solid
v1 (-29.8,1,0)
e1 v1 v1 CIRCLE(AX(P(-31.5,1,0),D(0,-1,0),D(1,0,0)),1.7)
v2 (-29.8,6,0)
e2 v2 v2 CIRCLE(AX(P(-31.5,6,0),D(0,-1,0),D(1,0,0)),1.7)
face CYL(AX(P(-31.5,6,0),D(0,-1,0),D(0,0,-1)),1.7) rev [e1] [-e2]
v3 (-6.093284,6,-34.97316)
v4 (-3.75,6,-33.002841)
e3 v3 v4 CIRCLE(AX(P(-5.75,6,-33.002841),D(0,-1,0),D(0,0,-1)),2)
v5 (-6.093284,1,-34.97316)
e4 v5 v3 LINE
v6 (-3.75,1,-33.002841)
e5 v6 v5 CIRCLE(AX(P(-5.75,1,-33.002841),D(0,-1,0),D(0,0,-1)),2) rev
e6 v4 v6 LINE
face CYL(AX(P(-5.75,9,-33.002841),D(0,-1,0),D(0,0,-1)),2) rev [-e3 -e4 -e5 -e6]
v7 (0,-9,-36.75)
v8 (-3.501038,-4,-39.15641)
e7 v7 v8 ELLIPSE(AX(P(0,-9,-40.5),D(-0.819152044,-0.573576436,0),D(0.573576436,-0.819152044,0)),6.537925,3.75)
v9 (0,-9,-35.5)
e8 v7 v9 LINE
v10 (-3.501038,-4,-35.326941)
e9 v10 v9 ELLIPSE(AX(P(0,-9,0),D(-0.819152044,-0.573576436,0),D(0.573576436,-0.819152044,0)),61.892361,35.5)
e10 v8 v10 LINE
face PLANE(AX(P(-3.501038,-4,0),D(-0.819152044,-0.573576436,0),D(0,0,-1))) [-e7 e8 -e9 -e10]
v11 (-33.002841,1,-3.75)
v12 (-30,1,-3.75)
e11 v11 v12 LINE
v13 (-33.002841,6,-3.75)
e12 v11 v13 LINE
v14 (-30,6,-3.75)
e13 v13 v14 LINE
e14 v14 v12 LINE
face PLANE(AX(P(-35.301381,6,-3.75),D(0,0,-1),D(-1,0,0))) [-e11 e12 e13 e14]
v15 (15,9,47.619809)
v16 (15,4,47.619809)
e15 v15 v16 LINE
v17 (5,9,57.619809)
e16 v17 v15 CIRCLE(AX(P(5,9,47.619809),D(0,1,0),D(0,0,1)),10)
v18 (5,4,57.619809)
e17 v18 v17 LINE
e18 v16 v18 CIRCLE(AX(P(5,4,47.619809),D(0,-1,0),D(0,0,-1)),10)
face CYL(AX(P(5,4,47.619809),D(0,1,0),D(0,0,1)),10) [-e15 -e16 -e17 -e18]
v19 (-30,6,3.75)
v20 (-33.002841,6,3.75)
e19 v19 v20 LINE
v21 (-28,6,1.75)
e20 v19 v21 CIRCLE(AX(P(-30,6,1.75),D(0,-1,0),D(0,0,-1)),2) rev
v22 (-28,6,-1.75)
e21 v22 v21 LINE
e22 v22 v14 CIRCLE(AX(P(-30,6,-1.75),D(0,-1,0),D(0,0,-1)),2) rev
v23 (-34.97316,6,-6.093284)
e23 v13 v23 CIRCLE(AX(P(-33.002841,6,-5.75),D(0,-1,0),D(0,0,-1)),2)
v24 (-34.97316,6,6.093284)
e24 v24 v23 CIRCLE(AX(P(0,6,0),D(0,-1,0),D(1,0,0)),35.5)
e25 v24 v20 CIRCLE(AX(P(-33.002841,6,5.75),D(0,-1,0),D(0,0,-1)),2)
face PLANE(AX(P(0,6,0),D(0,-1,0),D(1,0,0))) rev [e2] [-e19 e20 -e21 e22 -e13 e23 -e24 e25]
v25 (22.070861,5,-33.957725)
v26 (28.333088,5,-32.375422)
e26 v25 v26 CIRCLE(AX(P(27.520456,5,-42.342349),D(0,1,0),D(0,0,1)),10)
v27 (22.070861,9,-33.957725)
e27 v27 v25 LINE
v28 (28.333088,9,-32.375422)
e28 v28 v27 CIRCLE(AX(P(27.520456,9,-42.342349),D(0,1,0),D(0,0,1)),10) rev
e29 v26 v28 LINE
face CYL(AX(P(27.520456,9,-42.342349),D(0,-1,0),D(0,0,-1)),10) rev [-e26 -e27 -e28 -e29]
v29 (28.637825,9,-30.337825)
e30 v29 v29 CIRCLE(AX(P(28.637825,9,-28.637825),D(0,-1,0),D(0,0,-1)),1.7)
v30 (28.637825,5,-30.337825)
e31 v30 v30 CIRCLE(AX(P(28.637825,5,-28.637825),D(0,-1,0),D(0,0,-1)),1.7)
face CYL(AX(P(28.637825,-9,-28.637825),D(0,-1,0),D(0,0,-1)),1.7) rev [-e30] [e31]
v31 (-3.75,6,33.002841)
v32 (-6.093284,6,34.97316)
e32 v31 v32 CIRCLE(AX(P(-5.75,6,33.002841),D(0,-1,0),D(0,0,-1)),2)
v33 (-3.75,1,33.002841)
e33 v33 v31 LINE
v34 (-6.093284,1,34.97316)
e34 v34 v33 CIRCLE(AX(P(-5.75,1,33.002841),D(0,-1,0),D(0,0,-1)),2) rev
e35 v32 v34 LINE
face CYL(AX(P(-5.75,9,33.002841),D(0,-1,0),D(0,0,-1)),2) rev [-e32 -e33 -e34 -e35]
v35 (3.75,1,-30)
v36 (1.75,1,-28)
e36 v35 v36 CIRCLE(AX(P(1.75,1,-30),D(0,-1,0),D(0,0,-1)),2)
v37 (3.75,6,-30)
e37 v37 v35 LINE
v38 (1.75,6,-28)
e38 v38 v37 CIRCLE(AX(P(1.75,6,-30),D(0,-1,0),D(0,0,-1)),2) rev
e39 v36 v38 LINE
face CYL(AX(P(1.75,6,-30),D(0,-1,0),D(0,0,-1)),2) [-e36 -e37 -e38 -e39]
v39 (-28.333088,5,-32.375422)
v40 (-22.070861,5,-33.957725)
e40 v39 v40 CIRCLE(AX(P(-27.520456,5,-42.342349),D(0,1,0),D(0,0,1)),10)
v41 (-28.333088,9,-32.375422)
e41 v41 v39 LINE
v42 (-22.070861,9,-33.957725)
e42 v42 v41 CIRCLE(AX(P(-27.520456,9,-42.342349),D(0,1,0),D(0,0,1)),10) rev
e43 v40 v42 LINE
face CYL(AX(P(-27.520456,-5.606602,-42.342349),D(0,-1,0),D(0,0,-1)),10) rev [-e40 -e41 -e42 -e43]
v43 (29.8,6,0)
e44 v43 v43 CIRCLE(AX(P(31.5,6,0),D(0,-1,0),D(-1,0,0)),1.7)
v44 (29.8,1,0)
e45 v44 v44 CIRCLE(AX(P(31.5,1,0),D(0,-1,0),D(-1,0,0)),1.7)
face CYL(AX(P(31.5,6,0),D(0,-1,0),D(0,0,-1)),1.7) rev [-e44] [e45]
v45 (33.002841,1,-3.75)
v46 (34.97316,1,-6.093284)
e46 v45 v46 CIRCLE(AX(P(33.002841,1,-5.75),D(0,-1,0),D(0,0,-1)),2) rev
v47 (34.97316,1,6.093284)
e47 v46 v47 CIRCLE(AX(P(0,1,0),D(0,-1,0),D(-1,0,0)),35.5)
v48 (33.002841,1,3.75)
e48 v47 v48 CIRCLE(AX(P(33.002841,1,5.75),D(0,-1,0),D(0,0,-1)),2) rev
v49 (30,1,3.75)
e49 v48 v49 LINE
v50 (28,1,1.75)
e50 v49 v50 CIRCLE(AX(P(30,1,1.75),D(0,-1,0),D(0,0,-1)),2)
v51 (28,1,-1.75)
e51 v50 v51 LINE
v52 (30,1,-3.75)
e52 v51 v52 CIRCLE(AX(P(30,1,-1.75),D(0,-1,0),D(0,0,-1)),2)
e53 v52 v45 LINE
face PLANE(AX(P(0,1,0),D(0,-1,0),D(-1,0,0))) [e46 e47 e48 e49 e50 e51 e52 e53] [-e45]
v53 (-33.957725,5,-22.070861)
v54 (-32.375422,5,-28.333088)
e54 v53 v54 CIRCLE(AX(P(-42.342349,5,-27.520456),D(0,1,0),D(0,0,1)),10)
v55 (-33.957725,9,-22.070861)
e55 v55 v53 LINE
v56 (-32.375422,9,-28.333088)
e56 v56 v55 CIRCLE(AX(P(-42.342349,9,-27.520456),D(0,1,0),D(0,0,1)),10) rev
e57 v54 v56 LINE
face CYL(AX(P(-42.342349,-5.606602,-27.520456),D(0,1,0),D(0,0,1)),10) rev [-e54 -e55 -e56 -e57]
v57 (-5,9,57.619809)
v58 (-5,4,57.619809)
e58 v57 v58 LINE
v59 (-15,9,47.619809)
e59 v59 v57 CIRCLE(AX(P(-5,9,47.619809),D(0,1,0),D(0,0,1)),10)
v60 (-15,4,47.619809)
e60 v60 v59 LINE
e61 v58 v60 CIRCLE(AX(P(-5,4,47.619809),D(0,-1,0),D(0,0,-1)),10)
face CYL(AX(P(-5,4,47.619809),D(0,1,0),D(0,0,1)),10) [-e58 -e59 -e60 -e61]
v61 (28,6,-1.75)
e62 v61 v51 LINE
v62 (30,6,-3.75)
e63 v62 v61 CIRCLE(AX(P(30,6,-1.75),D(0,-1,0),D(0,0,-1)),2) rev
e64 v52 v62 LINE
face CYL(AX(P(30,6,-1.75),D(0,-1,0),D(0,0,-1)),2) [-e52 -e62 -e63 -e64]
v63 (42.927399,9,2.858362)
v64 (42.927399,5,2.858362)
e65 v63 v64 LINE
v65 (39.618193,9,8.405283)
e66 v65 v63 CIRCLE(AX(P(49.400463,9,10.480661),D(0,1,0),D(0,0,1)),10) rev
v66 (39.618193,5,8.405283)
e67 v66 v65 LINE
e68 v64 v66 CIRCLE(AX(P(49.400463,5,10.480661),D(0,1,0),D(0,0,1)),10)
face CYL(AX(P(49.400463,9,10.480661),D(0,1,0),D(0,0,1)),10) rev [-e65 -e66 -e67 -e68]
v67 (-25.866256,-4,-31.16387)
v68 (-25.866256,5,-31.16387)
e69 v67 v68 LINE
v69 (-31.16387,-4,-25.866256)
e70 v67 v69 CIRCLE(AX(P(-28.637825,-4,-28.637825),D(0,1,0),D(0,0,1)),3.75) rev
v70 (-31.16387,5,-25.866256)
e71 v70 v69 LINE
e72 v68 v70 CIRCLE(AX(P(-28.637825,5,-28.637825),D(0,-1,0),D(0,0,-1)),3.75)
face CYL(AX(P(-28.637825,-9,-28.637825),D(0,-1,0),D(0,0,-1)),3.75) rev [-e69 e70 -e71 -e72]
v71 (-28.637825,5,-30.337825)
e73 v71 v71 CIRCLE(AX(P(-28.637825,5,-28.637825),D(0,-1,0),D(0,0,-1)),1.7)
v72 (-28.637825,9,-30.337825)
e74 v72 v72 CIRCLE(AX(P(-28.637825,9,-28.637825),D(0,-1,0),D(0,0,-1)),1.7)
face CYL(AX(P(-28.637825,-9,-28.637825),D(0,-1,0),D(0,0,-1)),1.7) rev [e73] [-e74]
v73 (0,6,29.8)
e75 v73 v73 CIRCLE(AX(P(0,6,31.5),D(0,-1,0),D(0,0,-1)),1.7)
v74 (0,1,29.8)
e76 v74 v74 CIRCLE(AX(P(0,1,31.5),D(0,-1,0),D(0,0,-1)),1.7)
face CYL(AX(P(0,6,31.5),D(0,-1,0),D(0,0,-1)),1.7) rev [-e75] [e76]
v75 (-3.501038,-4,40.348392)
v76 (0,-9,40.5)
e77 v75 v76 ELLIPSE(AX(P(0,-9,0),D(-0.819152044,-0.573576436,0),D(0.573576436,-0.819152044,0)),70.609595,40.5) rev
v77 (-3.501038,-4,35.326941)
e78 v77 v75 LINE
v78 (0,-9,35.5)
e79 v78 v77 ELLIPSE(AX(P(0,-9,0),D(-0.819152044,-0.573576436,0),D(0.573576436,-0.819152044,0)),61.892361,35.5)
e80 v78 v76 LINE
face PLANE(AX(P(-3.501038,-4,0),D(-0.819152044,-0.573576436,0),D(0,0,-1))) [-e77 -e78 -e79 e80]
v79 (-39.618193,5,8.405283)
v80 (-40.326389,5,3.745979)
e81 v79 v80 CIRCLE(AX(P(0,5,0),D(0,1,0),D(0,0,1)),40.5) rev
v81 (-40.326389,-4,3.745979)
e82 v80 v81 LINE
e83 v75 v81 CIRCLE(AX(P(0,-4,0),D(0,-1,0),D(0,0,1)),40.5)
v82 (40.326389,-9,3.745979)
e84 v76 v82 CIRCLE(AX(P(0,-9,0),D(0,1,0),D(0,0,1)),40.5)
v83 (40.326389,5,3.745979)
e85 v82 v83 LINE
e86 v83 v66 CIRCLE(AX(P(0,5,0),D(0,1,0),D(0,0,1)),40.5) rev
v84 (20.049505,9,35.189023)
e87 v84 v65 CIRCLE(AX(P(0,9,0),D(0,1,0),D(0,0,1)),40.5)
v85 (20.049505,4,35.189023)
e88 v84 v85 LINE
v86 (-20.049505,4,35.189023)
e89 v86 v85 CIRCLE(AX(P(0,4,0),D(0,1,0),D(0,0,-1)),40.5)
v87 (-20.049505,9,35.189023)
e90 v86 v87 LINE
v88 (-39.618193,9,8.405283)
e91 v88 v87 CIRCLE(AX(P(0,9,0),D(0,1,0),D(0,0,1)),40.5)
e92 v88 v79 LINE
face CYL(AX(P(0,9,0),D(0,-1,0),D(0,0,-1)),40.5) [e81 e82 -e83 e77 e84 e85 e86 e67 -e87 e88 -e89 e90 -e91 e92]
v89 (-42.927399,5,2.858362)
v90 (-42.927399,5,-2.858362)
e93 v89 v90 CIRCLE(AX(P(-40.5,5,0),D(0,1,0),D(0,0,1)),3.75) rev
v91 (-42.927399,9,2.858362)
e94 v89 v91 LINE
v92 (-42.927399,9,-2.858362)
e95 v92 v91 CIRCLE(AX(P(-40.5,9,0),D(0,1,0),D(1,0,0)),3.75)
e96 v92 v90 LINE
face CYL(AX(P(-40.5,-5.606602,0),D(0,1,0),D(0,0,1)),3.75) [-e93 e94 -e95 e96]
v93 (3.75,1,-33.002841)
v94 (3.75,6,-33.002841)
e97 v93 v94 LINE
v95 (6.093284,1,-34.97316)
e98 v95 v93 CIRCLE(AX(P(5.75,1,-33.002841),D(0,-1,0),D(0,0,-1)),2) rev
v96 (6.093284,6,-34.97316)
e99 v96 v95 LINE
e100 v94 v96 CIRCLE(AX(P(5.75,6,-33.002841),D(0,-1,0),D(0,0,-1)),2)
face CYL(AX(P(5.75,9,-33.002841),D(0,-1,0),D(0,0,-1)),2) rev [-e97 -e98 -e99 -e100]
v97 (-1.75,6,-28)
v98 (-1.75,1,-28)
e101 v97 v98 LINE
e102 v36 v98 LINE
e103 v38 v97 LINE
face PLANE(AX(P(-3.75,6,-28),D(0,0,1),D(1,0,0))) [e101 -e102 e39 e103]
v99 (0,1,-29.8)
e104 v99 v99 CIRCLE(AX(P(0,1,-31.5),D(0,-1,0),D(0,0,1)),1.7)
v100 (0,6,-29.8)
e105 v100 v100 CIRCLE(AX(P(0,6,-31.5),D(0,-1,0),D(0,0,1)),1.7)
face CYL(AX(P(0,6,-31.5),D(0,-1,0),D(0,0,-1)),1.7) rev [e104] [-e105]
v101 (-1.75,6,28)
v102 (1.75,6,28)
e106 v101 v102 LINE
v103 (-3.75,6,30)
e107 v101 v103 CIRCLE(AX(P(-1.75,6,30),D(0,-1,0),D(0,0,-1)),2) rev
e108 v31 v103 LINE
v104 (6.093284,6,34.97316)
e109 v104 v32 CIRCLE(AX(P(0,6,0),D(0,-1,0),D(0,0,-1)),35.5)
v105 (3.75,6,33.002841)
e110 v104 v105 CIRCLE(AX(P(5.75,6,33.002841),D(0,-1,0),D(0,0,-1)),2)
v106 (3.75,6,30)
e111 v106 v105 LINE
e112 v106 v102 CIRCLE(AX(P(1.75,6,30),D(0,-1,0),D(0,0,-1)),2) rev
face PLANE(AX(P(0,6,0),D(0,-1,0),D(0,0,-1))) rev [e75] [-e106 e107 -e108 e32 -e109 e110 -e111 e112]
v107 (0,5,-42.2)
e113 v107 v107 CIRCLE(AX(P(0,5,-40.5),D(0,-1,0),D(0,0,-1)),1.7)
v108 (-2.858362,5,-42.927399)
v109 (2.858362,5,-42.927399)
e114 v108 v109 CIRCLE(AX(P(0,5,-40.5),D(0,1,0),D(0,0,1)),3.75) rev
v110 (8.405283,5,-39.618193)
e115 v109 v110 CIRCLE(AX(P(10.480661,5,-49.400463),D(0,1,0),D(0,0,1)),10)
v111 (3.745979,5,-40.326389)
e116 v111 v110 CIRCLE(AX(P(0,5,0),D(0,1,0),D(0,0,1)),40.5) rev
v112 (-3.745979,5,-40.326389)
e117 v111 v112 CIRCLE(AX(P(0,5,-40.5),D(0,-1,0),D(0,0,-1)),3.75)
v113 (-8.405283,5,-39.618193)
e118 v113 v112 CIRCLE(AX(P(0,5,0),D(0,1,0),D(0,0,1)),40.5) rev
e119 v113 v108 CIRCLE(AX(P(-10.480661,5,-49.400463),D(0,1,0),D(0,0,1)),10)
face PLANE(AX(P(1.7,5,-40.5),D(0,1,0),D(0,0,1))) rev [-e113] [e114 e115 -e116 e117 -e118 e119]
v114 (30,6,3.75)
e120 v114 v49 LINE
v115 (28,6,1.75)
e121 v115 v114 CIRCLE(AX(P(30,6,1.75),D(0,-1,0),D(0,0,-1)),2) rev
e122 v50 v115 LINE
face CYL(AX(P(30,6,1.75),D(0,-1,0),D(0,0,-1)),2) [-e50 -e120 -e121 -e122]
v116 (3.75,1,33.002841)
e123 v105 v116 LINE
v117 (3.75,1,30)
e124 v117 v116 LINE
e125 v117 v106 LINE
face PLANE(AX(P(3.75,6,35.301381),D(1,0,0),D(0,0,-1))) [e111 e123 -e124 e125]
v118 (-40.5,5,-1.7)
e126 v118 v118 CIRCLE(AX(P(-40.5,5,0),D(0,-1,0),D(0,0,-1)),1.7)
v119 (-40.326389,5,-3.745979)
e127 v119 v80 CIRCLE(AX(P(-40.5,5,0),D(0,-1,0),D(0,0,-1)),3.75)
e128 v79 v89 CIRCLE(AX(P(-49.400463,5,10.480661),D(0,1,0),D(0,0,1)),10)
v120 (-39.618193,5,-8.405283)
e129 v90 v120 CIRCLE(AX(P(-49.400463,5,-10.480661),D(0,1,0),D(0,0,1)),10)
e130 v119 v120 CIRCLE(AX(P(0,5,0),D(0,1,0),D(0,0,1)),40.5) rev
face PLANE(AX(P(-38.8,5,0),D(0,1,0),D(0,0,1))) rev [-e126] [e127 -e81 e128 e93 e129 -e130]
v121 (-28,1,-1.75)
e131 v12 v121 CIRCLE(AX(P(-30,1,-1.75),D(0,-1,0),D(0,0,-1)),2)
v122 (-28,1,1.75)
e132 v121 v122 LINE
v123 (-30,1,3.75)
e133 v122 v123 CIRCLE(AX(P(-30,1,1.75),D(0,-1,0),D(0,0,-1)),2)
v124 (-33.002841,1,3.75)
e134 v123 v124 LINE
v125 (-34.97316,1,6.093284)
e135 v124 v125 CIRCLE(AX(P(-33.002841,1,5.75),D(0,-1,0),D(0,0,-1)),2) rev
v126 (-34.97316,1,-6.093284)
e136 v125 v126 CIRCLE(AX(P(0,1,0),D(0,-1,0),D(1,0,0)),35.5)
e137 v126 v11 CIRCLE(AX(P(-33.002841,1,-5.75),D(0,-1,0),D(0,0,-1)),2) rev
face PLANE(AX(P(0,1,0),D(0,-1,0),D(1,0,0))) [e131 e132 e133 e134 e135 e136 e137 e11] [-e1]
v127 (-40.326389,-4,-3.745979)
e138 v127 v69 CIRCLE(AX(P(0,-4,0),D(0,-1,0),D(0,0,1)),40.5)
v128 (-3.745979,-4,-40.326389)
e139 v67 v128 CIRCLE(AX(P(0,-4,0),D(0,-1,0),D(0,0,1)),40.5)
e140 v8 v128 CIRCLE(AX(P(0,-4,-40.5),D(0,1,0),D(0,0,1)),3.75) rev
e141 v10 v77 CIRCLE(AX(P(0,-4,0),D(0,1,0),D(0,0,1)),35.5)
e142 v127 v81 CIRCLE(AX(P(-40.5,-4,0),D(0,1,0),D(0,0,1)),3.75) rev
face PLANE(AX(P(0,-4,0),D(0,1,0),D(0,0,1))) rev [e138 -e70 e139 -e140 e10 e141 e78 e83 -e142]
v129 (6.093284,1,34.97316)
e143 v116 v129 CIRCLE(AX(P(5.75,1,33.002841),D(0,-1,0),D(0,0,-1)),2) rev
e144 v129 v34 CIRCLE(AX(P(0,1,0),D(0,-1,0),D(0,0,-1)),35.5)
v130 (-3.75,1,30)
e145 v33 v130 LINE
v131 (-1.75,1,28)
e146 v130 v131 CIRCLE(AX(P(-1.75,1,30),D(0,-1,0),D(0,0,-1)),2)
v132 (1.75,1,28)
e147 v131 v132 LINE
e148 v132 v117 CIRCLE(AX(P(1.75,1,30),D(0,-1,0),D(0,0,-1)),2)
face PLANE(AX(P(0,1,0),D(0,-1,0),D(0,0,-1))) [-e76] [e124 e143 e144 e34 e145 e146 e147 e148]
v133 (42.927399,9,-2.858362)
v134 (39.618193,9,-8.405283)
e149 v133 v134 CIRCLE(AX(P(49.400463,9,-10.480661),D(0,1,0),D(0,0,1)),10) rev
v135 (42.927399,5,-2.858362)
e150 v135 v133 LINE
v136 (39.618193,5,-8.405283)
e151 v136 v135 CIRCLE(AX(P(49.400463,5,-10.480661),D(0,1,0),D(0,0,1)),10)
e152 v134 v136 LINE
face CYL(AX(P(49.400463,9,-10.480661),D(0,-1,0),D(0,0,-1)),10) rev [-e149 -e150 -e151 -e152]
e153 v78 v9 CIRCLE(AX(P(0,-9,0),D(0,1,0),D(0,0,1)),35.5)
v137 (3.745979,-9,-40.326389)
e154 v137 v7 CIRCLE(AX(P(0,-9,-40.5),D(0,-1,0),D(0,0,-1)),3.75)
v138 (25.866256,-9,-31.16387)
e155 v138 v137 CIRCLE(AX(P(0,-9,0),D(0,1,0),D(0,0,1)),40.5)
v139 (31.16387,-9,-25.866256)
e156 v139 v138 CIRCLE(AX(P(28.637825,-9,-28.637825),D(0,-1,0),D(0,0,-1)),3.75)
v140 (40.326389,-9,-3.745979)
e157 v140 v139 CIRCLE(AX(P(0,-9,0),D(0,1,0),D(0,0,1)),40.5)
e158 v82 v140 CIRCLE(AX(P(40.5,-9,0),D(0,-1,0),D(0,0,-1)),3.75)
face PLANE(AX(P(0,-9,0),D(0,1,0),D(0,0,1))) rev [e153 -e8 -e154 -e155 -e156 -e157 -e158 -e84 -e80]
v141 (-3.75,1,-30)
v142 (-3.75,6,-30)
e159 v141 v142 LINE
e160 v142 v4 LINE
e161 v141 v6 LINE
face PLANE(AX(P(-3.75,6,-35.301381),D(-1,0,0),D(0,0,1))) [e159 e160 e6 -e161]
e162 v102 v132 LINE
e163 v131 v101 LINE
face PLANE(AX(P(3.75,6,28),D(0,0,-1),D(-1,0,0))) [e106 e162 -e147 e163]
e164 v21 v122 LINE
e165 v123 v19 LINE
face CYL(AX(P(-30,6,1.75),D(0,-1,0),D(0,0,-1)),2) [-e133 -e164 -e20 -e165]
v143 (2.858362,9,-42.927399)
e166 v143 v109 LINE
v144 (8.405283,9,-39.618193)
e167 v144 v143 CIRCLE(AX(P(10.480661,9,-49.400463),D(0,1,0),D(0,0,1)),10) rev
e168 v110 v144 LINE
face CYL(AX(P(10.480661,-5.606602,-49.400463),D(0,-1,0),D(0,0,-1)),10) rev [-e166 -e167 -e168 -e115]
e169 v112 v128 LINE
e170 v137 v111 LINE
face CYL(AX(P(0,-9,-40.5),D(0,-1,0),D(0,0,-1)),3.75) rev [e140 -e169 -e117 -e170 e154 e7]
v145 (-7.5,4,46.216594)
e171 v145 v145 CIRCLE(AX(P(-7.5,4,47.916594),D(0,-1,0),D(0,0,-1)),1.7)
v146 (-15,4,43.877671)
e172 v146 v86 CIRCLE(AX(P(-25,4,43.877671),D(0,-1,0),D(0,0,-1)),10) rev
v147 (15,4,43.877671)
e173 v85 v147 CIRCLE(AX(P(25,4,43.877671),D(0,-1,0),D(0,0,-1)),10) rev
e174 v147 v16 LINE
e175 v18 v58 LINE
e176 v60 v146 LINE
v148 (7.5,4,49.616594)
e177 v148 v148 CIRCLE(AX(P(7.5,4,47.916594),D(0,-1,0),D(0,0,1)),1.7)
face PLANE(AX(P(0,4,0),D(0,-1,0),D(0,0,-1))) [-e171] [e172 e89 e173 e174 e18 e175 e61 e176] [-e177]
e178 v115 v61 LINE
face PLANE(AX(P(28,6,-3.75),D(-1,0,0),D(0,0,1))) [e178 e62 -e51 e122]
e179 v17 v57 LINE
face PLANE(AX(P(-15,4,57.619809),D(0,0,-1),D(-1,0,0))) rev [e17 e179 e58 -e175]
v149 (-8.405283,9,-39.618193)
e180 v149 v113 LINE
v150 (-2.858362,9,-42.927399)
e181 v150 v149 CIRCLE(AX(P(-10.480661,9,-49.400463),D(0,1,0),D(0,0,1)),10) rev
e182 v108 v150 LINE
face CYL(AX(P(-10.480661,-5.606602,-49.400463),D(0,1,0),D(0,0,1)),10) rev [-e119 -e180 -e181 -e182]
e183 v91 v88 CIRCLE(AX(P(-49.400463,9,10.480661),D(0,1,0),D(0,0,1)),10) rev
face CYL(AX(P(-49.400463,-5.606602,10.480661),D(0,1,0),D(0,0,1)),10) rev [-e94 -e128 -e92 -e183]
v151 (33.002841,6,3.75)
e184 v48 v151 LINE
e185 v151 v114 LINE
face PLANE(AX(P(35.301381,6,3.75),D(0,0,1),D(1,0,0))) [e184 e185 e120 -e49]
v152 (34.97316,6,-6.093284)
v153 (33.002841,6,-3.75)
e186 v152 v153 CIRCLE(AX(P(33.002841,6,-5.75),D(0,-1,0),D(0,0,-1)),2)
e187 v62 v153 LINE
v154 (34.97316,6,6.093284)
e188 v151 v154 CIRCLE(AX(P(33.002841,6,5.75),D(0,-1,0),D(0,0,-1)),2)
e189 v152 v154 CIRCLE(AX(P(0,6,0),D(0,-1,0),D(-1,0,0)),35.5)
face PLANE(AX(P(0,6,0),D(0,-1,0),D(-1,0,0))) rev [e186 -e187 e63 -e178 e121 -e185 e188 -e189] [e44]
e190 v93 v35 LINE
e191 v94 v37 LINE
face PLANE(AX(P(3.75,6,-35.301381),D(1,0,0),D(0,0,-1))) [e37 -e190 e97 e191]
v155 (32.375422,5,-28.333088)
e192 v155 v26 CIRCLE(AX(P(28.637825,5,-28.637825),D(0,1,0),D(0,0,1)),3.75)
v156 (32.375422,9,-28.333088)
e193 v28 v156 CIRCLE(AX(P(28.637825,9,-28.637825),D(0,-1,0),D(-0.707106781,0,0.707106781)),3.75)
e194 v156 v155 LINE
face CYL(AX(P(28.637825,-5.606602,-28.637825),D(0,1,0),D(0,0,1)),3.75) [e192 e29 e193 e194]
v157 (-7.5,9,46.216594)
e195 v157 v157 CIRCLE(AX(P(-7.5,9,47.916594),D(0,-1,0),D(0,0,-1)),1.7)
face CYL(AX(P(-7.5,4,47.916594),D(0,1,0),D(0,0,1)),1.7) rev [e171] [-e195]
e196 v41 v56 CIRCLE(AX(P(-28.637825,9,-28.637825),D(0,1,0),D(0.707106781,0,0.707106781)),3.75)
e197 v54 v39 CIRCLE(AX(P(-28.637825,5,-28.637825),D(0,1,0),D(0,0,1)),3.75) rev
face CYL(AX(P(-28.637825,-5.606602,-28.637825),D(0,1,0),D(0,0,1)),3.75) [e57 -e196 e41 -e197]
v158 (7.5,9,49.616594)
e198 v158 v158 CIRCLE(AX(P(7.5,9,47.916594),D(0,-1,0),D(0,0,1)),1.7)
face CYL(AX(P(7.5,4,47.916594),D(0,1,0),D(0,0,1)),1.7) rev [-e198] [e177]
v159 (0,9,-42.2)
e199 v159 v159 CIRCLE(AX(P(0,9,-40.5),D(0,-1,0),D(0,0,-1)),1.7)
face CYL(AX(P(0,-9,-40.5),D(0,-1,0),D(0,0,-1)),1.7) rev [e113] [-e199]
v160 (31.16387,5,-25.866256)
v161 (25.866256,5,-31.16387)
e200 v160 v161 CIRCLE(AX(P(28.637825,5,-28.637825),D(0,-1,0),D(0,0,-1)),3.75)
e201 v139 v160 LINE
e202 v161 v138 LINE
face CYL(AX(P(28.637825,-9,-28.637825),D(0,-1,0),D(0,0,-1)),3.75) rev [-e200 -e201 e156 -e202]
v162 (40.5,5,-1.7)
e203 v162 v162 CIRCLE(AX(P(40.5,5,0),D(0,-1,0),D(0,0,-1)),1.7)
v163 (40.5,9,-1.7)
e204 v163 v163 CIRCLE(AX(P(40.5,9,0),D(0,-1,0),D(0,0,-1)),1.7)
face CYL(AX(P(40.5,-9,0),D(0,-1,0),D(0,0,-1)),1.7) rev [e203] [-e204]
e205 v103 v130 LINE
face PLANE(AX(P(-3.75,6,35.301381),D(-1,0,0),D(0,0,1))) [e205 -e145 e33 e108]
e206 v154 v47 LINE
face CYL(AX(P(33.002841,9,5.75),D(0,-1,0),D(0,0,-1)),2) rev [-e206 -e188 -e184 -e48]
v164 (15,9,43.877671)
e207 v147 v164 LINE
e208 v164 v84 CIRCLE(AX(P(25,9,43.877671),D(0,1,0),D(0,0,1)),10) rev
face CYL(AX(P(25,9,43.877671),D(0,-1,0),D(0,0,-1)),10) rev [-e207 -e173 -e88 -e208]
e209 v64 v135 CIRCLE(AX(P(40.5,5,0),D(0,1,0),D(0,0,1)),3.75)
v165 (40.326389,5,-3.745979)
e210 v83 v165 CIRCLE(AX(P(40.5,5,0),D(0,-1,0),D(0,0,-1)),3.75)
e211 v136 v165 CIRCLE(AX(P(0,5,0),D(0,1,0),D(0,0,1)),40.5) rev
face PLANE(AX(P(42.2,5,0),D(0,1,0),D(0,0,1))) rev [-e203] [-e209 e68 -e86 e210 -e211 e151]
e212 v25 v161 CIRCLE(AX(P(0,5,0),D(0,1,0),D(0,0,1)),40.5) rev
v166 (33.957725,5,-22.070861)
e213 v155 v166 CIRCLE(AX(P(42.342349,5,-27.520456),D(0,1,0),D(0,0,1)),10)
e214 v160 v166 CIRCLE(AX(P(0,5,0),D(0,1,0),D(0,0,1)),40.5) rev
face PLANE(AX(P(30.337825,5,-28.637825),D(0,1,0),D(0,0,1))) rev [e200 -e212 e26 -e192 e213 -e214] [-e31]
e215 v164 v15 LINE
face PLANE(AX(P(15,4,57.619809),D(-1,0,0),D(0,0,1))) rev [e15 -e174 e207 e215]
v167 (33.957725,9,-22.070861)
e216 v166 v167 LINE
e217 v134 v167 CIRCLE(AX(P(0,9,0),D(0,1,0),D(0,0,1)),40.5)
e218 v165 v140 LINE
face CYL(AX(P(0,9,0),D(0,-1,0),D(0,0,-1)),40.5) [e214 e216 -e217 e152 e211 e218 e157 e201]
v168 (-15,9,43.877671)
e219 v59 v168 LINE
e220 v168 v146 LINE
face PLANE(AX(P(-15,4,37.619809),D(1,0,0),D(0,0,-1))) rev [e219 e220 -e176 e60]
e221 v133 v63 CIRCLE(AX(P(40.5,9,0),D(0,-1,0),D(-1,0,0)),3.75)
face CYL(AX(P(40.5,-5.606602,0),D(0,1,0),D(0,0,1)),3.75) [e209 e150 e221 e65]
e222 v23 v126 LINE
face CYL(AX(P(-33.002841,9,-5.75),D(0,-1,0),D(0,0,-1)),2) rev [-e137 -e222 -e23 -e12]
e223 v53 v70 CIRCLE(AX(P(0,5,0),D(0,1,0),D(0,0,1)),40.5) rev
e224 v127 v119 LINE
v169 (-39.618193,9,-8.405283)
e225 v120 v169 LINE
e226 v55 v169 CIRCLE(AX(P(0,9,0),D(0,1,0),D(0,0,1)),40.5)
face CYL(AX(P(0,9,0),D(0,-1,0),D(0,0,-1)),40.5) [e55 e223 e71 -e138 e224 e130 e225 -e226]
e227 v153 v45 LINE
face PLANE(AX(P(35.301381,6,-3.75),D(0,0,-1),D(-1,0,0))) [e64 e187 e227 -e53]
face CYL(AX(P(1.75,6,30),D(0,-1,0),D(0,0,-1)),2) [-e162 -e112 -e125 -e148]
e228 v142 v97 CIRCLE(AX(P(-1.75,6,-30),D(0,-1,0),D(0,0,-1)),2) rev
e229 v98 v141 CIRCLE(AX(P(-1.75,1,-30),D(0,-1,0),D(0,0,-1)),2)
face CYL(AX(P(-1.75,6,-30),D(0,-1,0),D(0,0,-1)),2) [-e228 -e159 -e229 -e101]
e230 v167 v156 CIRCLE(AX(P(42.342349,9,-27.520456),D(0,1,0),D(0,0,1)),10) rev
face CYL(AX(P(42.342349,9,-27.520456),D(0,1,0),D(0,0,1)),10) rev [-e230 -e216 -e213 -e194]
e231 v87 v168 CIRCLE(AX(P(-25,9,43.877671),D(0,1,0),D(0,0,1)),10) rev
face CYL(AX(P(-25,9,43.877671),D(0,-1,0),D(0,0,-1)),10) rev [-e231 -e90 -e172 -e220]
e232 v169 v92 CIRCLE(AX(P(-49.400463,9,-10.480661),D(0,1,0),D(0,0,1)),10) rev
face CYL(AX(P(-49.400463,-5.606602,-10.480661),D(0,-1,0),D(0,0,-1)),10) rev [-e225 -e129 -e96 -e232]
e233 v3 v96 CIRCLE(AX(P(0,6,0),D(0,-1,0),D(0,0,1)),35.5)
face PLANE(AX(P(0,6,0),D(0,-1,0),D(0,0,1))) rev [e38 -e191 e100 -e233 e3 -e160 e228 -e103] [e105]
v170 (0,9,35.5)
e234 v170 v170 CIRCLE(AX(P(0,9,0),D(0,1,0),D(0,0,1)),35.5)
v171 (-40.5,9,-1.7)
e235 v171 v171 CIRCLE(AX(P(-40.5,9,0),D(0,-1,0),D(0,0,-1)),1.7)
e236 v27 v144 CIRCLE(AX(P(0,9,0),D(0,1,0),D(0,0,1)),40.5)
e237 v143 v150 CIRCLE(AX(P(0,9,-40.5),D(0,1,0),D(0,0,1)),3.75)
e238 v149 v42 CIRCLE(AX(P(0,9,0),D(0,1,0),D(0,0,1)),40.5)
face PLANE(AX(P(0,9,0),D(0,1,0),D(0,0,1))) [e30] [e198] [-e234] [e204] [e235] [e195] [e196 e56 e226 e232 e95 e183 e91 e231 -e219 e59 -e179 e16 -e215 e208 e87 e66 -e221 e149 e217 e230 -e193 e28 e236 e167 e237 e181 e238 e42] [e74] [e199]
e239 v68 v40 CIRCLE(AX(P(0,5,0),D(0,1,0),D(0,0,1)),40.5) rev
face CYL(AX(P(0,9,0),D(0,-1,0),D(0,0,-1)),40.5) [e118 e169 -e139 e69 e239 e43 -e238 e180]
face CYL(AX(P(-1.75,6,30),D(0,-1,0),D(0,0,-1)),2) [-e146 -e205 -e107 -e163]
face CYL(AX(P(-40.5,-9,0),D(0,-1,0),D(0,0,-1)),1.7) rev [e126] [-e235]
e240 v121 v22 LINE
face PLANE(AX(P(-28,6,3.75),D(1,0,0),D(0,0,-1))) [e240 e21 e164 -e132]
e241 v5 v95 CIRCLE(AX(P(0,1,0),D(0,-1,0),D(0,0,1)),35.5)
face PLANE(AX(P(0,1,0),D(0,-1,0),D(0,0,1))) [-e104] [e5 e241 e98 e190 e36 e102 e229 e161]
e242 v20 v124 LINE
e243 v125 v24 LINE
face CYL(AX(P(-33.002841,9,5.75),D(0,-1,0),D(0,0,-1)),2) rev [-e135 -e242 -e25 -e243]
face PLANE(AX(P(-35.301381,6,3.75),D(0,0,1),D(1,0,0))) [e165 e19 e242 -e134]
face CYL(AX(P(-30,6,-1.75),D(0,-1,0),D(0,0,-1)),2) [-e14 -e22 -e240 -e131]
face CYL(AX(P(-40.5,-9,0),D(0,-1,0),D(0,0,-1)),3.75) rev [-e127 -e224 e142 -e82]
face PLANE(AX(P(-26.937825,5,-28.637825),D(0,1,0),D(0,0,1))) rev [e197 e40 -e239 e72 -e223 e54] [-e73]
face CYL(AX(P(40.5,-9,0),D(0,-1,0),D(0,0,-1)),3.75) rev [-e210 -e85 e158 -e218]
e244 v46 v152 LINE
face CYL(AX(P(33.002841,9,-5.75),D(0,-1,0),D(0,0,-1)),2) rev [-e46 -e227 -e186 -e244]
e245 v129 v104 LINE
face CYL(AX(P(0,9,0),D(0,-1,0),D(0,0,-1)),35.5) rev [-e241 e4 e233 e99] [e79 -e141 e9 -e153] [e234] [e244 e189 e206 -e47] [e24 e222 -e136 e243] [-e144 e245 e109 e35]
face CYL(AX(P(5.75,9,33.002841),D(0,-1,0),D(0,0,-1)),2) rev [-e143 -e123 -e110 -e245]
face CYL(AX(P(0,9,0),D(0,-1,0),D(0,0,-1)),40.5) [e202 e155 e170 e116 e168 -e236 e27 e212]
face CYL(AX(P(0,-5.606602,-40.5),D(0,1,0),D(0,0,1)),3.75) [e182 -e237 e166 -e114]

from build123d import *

# Parameters (mm, degrees)
CROQUIS1_R                                           = 40.5
CROQUIS1_R_2                                         = 35.5
SALIENTE_EXTRUIR1_DEPTH                              = 9
CROQUIS2_R                                           = 1.7
SALIENTE_EXTRUIR2_DEPTH                              = 5
REDONDEO1_R                                          = 10
CROQUIS4_R                                           = 1.7
SALIENTE_EXTRUIR3_DEPTH                              = 5
REDONDEO2_R                                          = 2
MATRIZC1_COUNT                                       = 4
REDONDEO2_OF_MATRIZC1_R                              = 2
REFRENTADO_PARA_TORNILLO_CON_CABEZA_PLAN_D           = 3.4
REFRENTADO_PARA_TORNILLO_CON_CABEZA_PLAN_CBORE_D     = 7.5
REFRENTADO_PARA_TORNILLO_CON_CABEZA_PLAN_CBORE_DEPTH = 14
CROQUIS8_R                                           = 3.75
CROQUIS8_R_2                                         = 1.7
SALIENTE_EXTRUIR4_DEPTH                              = 4
MATRIZC2_COUNT                                       = 3
MATRIZC2_ANGLE                                       = 90
SIMETR_A1_COPY_1_D                                   = 3.4
SIMETR_A1_COPY_1_CBORE_D                             = 7.5
SIMETR_A1_COPY_1_CBORE_DEPTH                         = 14
SIMETR_A1_COPY_2_D                                   = 3.4
SIMETR_A1_COPY_2_CBORE_D                             = 7.5
SIMETR_A1_COPY_2_CBORE_DEPTH                         = 14
SIMETR_A1_COPY_3_SKETCH_R                            = 3.75
SIMETR_A1_COPY_3_SKETCH_R_2                          = 1.7
SIMETR_A1_COPY_3_DEPTH                               = 4
SIMETR_A1_COPY_4_SKETCH_R                            = 3.75
SIMETR_A1_COPY_4_SKETCH_R_2                          = 1.7
SIMETR_A1_COPY_4_DEPTH                               = 4
SIMETR_A1_COPY_5_D                                   = 3.4
SIMETR_A1_COPY_5_CBORE_D                             = 7.5
SIMETR_A1_COPY_5_CBORE_DEPTH                         = 14
SIMETR_A1_COPY_6_SKETCH_R                            = 3.75
SIMETR_A1_COPY_6_SKETCH_R_2                          = 1.7
SIMETR_A1_COPY_6_DEPTH                               = 4
REDONDEO3_R                                          = 10
CORTAR_EXTRUIR2_START                                = -5
CORTAR_EXTRUIR2_DEPTH                                = 5
CHAFL_N2_SIZE2                                       = 5
CHAFL_N2_SIZE                                        = 3.501037691


# Some blends are built 0.0001 mm under size
with BuildPart() as part:
    # Croquis1 → Saliente-Extruir1 (new, symmetric)
    with BuildSketch(Plane(origin=(0, 0, 0), x_dir=(1, 0, 0), z_dir=(0, 1, 0))):
        with Locations(Location((0, 0, 0), (0, 0, 270))):
            Circle(CROQUIS1_R)
        with Locations(Location((0, 0, 0), (0, 0, 270))):
            Circle(CROQUIS1_R_2, mode=Mode.SUBTRACT)
    extrude(amount=SALIENTE_EXTRUIR1_DEPTH, both=True)

    # Croquis2 → Saliente-Extruir2 (add)
    with BuildSketch(Plane.XZ.offset(-9)):
        with BuildLine():
            Line((-15, 37.619808612), (-15, 57.619808612))
            Line((-15, 57.619808612), (15, 57.619808612))
            Line((15, 57.619808612), (15, 37.619808612))
            ThreePointArc((15, 37.619808612), (0, 40.5), (-15, 37.619808612))
        make_face()
        with Locations(Location((-7.5, 47.916594203, 0), (0, 0, 270))):
            Circle(CROQUIS2_R, mode=Mode.SUBTRACT)
        with Locations(Location((7.5, 47.916594203, 0), (0, 0, 90))):
            Circle(CROQUIS2_R, mode=Mode.SUBTRACT)
    extrude(amount=SALIENTE_EXTRUIR2_DEPTH)

    # Redondeo1
    redondeo1_edges = [part.edges().sort_by_distance(p)[0] for p in [
        (-15, 6.5, 37.619808612),
        (15, 6.5, 37.619808612),
        (15, 6.5, 57.619808612),
        (-15, 6.5, 57.619808612),
    ]]
    fillet(redondeo1_edges, radius=REDONDEO1_R)

    # Croquis4 → Saliente-Extruir3 (add)
    with BuildSketch(Plane(origin=(0, 1, 0), x_dir=(-1, 0, 0), z_dir=(0, -1, 0))):
        with BuildLine():
            Line((-3.75, -35.301380993), (-3.75, -28))
            Line((-3.75, -28), (3.75, -28))
            Line((3.75, -28), (3.75, -35.301380993))
            ThreePointArc((3.75, -35.301380993), (0, -35.5), (-3.75, -35.301380993))
        make_face()
        with Locations(Location((0, -31.5, 0), (0, 0, 90))):
            Circle(CROQUIS4_R, mode=Mode.SUBTRACT)
    saliente_extruir3 = extrude(amount=-SALIENTE_EXTRUIR3_DEPTH)

    # Redondeo2
    redondeo2_edges = [part.edges().sort_by_distance(p)[0] for p in [
        (-3.75, 3.5, 35.301380993),
        (3.75, 3.5, 35.301380993),
        (3.75, 3.5, 28),
        (-3.75, 3.5, 28),
    ]]
    fillet(redondeo2_edges, radius=REDONDEO2_R)

    # MatrizC1: Saliente-Extruir3 ×4 about axis
    matrizc1_axis = Axis((0, 0, 0), (0, 1, 0))
    for i in range(1, MATRIZC1_COUNT):
        add(saliente_extruir3.rotate(matrizc1_axis, i * 360 / MATRIZC1_COUNT))

    # Redondeo2 of MatrizC1
    redondeo2_of_matrizc1_edges = [part.edges().sort_by_distance(p)[0] for p in [
        (35.301380993, 3.5, 3.75),
        (35.301380993, 3.5, -3.75),
        (28, 3.5, -3.75),
        (28, 3.5, 3.75),
        (3.75, 3.5, -35.301380993),
        (-3.75, 3.5, -35.301380993),
        (-3.75, 3.5, -28),
        (3.75, 3.5, -28),
        (-35.301380993, 3.5, -3.75),
        (-35.301380993, 3.5, 3.75),
        (-28, 3.5, 3.75),
        (-28, 3.5, -3.75),
    ]]
    fillet(redondeo2_of_matrizc1_edges, radius=REDONDEO2_OF_MATRIZC1_R)

    # Refrentado para tornillo con cabeza plana de M31 (through all)
    with Locations(Plane(origin=(0, -9, 0), x_dir=(-1, 0, 0), z_dir=(0, -1, 0))):
        with Locations((0, 40.5)):
            refrentado_para_tornillo_con_cabeza_plan = CounterBoreHole(REFRENTADO_PARA_TORNILLO_CON_CABEZA_PLAN_D / 2, REFRENTADO_PARA_TORNILLO_CON_CABEZA_PLAN_CBORE_D / 2, REFRENTADO_PARA_TORNILLO_CON_CABEZA_PLAN_CBORE_DEPTH)

    # Croquis8 → Saliente-Extruir4 (add)
    with BuildSketch(Plane(origin=(0, 9, 0), x_dir=(1, 0, 0), z_dir=(0, 1, 0))):
        with Locations((0, 40.5)):
            Circle(CROQUIS8_R)
        with Locations(Location((0, 40.5, 0), (0, 0, 90))):
            Circle(CROQUIS8_R_2, mode=Mode.SUBTRACT)
    saliente_extruir4 = extrude(amount=-SALIENTE_EXTRUIR4_DEPTH)

    # MatrizC2: Refrentado para tornillo con cabeza plana de M31, Saliente-Extruir4 ×3 about axis
    matrizc2_axis = Axis((0, 0, 0), (0, 1, 0))
    add([refrentado_para_tornillo_con_cabeza_plan.rotate(matrizc2_axis, i * MATRIZC2_ANGLE / (MATRIZC2_COUNT - 1)) for i in range(1, MATRIZC2_COUNT)], mode=Mode.SUBTRACT)
    add([saliente_extruir4.rotate(matrizc2_axis, i * MATRIZC2_ANGLE / (MATRIZC2_COUNT - 1)) for i in range(1, MATRIZC2_COUNT)])

    # Simetría1 copy 1 (through all)
    with Locations(Plane(origin=(0, -9, 0), x_dir=(0.7071067811865462, 0, 0.7071067811865488), z_dir=(0, -1, 0))):
        with Locations((0, -40.5)):
            CounterBoreHole(SIMETR_A1_COPY_1_D / 2, SIMETR_A1_COPY_1_CBORE_D / 2, SIMETR_A1_COPY_1_CBORE_DEPTH)

    # Simetría1 copy 2 (through all)
    with Locations(Plane(origin=(0, -9, 0), x_dir=(0, 0, 1), z_dir=(0, -1, 0))):
        with Locations((0, -40.5)):
            CounterBoreHole(SIMETR_A1_COPY_2_D / 2, SIMETR_A1_COPY_2_CBORE_D / 2, SIMETR_A1_COPY_2_CBORE_DEPTH)

    # Simetría1 copy 3 sketch → Simetría1 copy 3 (add)
    with BuildSketch(Plane(origin=(0, 9, 0), x_dir=(-0.7071067811865462, 0, -0.7071067811865488), z_dir=(0, 1, 0))):
        with Locations((0, -40.5)):
            Circle(SIMETR_A1_COPY_3_SKETCH_R)
        with Locations((0, -40.5)):
            Circle(SIMETR_A1_COPY_3_SKETCH_R_2, mode=Mode.SUBTRACT)
    extrude(amount=-SIMETR_A1_COPY_3_DEPTH)

    # Simetría1 copy 4 sketch → Simetría1 copy 4 (add)
    with BuildSketch(Plane(origin=(0, 9, 0), x_dir=(0, 0, -1), z_dir=(0, 1, 0))):
        with Locations((0, -40.5)):
            Circle(SIMETR_A1_COPY_4_SKETCH_R)
        with Locations((0, -40.5)):
            Circle(SIMETR_A1_COPY_4_SKETCH_R_2, mode=Mode.SUBTRACT)
    extrude(amount=-SIMETR_A1_COPY_4_DEPTH)

    # Simetría1 copy 5 (through all)
    with Locations(Plane.XZ.offset(9)):
        with Locations((0, -40.5)):
            CounterBoreHole(SIMETR_A1_COPY_5_D / 2, SIMETR_A1_COPY_5_CBORE_D / 2, SIMETR_A1_COPY_5_CBORE_DEPTH)

    # Simetría1 copy 6 sketch → Simetría1 copy 6 (add)
    with BuildSketch(Plane(origin=(0, 9, 0), x_dir=(-1, 0, 0), z_dir=(0, 1, 0))):
        with Locations((0, -40.5)):
            Circle(SIMETR_A1_COPY_6_SKETCH_R)
        with Locations((0, -40.5)):
            Circle(SIMETR_A1_COPY_6_SKETCH_R_2, mode=Mode.SUBTRACT)
    extrude(amount=-SIMETR_A1_COPY_6_DEPTH)

    # Redondeo3
    # the kernel refuses this fillet: 10 mm, written as the material it adds along each edge
    with BuildSketch(Plane(origin=(3.745979069, 5, -40.326388889), x_dir=(-0.3229702045586981, 0, -0.9464091329690941), z_dir=(0, 1, 0)), Plane(origin=(-25.866255843, 5, -31.163870246), x_dir=(-0.8975867374639902, 0, -0.4408378939346639), z_dir=(0, 1, 0)), Plane(origin=(-40.326388889, 5, -3.745979069), x_dir=(-0.9464091329690931, 0, 0.3229702045587014), z_dir=(0, 1, 0)), Plane(origin=(31.163870246, 5, -25.866255843), x_dir=(0.4408378939346665, 0, -0.897586737463989), z_dir=(0, 1, 0)), Plane(origin=(40.326388889, 5, 3.745979069), x_dir=(0.9464091329690957, 0, -0.32297020455869396), z_dir=(0, 1, 0))) as redondeo3_piece_1:
        with BuildLine():
            CenterArc((6.412684914, -9.30442023), REDONDEO3_R, 111.496176577, 37.683075119)
            ThreePointArc((-2.175059251, -4.180881398), (-1.026664082, -2.122105354), (0, 0))
            ThreePointArc((0, 0), (1.374146767, -0.260842414), (2.748293534, 0))
        make_face()
    extrude(amount=4)
    with BuildSketch(Plane(origin=(-3.745979069, 5, -40.326388889), x_dir=(-0.9886449734760148, 0, 0.15027014480797551), z_dir=(0, 1, 0)), Plane(origin=(-31.163870246, 5, -25.866255843), x_dir=(-0.5928205265272785, 0, 0.80533460333449), z_dir=(0, 1, 0)), Plane(origin=(25.866255843, 5, -31.163870246), x_dir=(-0.8053346033344878, 0, -0.5928205265272815), z_dir=(0, 1, 0)), Plane(origin=(40.326388889, 5, -3.745979069), x_dir=(-0.15027014480797213, 0, -0.9886449734760153), z_dir=(0, 1, 0))) as redondeo3_piece_2:
        with BuildLine():
            CenterArc((5.294647205, -9.98305938), REDONDEO3_R, 93.33552043, 37.683075119)
            ThreePointArc((-1.268392176, -2.438093238), (-0.402794996, -1.339430586), (0, 0))
            ThreePointArc((0, 0), (2.356408921, -0.068609509), (4.712817842, 0))
        make_face()
    extrude(amount=4)
    with BuildSketch(Plane(origin=(-40.326388889, 5, 3.745979069), x_dir=(-0.9464091329690953, 0, -0.322970204558695), z_dir=(0, 1, 0))) as redondeo3_piece_3:
        with BuildLine():
            CenterArc((6.412684914, 9.30442023), REDONDEO3_R, 210.820748304, 37.683075119)
            ThreePointArc((-2.175059251, 4.180881398), (-1.026664082, 2.122105354), (0, 0))
            ThreePointArc((0, 0), (1.374146767, 0.260842414), (2.748293534, 0))
        make_face()
    extrude(amount=4)

    # Croquis10 → Cortar-Extruir2 (cut)
    with BuildSketch(Plane.XZ.offset(9).offset(CORTAR_EXTRUIR2_START)):
        with BuildLine():
            Line((0, 40.5), (0, 35.5))
            ThreePointArc((0, 35.5), (-35.5, 0), (0, -35.5))
            Line((0, -35.5), (0, -40.5))
            ThreePointArc((0, -40.5), (-40.5, 0), (0, 40.5))
        make_face()
    extrude(amount=CORTAR_EXTRUIR2_DEPTH, mode=Mode.SUBTRACT)

    # Chaflán2
    chafl_n2_edges = [part.edges().sort_by_distance(p)[0] for p in [
        (0, -4, -36.125),
    ]]
    chafl_n2_side = [part.faces().sort_by_distance(p)[0] for p in [
        (-0.070020754, -4, -36.125),
    ]]
    chamfer(chafl_n2_edges, length=CHAFL_N2_SIZE - 0.0001, length2=CHAFL_N2_SIZE2 - 0.0001, reference=chafl_n2_side[0])  # a hair under: the kernel refuses the full size
    # the kernel refuses this chamfer: 5, 3.501037691 mm, written as the material it adds along each edge
    with BuildSketch(Plane(origin=(0, -4, 53.412761151), x_dir=(-0.9989750717851554, 0.04526373771402081, 0), z_dir=(0, 0, -1))) as chafl_n2_2_piece_1_section:
        with BuildLine():
            Line((3.619462668, 0), (-0.348331978, -5.153345411))
            Line((-0.348331978, -5.153345411), (-0.448229485, -5.148819037))
            ThreePointArc((-0.448229485, -5.148819037), (-0.21676464, -2.574742553), (-0.099897507, 0.004526374))
            Line((-0.099897507, 0.004526374), (0.004526374, 0.099897507))
            ThreePointArc((0.004526374, 0.099897507), (1.810549919, 0.01806626), (3.623989042, 0.099897507))
            Line((3.623989042, 0.099897507), (3.619462668, 0))
        make_face()
    chafl_n2_2_piece_1 = extrude(amount=30.825522303, mode=Mode.PRIVATE)
    chafl_n2_2_piece_1 = chafl_n2_2_piece_1 - Plane(origin=(0, -5.656570303, 0), x_dir=(0, 0, 1), z_dir=(0, -1, 0)) * Cylinder(35.5, 83, mode=Mode.PRIVATE)
    chafl_n2_2_piece_1 = chafl_n2_2_piece_1 & Plane(origin=(0, -5.656570303, 0), x_dir=(0, 0, 1), z_dir=(0, 1, 0)) * Cylinder(40.5, 83, mode=Mode.PRIVATE)
    chafl_n2_2_piece_1 = split(chafl_n2_2_piece_1, bisect_by=Plane(origin=(-1.140213067, -9, 37.972268043), z_dir=(0, 1, 0)), keep=Keep.TOP, mode=Mode.PRIVATE)
    add(chafl_n2_2_piece_1)


solid = part.part
